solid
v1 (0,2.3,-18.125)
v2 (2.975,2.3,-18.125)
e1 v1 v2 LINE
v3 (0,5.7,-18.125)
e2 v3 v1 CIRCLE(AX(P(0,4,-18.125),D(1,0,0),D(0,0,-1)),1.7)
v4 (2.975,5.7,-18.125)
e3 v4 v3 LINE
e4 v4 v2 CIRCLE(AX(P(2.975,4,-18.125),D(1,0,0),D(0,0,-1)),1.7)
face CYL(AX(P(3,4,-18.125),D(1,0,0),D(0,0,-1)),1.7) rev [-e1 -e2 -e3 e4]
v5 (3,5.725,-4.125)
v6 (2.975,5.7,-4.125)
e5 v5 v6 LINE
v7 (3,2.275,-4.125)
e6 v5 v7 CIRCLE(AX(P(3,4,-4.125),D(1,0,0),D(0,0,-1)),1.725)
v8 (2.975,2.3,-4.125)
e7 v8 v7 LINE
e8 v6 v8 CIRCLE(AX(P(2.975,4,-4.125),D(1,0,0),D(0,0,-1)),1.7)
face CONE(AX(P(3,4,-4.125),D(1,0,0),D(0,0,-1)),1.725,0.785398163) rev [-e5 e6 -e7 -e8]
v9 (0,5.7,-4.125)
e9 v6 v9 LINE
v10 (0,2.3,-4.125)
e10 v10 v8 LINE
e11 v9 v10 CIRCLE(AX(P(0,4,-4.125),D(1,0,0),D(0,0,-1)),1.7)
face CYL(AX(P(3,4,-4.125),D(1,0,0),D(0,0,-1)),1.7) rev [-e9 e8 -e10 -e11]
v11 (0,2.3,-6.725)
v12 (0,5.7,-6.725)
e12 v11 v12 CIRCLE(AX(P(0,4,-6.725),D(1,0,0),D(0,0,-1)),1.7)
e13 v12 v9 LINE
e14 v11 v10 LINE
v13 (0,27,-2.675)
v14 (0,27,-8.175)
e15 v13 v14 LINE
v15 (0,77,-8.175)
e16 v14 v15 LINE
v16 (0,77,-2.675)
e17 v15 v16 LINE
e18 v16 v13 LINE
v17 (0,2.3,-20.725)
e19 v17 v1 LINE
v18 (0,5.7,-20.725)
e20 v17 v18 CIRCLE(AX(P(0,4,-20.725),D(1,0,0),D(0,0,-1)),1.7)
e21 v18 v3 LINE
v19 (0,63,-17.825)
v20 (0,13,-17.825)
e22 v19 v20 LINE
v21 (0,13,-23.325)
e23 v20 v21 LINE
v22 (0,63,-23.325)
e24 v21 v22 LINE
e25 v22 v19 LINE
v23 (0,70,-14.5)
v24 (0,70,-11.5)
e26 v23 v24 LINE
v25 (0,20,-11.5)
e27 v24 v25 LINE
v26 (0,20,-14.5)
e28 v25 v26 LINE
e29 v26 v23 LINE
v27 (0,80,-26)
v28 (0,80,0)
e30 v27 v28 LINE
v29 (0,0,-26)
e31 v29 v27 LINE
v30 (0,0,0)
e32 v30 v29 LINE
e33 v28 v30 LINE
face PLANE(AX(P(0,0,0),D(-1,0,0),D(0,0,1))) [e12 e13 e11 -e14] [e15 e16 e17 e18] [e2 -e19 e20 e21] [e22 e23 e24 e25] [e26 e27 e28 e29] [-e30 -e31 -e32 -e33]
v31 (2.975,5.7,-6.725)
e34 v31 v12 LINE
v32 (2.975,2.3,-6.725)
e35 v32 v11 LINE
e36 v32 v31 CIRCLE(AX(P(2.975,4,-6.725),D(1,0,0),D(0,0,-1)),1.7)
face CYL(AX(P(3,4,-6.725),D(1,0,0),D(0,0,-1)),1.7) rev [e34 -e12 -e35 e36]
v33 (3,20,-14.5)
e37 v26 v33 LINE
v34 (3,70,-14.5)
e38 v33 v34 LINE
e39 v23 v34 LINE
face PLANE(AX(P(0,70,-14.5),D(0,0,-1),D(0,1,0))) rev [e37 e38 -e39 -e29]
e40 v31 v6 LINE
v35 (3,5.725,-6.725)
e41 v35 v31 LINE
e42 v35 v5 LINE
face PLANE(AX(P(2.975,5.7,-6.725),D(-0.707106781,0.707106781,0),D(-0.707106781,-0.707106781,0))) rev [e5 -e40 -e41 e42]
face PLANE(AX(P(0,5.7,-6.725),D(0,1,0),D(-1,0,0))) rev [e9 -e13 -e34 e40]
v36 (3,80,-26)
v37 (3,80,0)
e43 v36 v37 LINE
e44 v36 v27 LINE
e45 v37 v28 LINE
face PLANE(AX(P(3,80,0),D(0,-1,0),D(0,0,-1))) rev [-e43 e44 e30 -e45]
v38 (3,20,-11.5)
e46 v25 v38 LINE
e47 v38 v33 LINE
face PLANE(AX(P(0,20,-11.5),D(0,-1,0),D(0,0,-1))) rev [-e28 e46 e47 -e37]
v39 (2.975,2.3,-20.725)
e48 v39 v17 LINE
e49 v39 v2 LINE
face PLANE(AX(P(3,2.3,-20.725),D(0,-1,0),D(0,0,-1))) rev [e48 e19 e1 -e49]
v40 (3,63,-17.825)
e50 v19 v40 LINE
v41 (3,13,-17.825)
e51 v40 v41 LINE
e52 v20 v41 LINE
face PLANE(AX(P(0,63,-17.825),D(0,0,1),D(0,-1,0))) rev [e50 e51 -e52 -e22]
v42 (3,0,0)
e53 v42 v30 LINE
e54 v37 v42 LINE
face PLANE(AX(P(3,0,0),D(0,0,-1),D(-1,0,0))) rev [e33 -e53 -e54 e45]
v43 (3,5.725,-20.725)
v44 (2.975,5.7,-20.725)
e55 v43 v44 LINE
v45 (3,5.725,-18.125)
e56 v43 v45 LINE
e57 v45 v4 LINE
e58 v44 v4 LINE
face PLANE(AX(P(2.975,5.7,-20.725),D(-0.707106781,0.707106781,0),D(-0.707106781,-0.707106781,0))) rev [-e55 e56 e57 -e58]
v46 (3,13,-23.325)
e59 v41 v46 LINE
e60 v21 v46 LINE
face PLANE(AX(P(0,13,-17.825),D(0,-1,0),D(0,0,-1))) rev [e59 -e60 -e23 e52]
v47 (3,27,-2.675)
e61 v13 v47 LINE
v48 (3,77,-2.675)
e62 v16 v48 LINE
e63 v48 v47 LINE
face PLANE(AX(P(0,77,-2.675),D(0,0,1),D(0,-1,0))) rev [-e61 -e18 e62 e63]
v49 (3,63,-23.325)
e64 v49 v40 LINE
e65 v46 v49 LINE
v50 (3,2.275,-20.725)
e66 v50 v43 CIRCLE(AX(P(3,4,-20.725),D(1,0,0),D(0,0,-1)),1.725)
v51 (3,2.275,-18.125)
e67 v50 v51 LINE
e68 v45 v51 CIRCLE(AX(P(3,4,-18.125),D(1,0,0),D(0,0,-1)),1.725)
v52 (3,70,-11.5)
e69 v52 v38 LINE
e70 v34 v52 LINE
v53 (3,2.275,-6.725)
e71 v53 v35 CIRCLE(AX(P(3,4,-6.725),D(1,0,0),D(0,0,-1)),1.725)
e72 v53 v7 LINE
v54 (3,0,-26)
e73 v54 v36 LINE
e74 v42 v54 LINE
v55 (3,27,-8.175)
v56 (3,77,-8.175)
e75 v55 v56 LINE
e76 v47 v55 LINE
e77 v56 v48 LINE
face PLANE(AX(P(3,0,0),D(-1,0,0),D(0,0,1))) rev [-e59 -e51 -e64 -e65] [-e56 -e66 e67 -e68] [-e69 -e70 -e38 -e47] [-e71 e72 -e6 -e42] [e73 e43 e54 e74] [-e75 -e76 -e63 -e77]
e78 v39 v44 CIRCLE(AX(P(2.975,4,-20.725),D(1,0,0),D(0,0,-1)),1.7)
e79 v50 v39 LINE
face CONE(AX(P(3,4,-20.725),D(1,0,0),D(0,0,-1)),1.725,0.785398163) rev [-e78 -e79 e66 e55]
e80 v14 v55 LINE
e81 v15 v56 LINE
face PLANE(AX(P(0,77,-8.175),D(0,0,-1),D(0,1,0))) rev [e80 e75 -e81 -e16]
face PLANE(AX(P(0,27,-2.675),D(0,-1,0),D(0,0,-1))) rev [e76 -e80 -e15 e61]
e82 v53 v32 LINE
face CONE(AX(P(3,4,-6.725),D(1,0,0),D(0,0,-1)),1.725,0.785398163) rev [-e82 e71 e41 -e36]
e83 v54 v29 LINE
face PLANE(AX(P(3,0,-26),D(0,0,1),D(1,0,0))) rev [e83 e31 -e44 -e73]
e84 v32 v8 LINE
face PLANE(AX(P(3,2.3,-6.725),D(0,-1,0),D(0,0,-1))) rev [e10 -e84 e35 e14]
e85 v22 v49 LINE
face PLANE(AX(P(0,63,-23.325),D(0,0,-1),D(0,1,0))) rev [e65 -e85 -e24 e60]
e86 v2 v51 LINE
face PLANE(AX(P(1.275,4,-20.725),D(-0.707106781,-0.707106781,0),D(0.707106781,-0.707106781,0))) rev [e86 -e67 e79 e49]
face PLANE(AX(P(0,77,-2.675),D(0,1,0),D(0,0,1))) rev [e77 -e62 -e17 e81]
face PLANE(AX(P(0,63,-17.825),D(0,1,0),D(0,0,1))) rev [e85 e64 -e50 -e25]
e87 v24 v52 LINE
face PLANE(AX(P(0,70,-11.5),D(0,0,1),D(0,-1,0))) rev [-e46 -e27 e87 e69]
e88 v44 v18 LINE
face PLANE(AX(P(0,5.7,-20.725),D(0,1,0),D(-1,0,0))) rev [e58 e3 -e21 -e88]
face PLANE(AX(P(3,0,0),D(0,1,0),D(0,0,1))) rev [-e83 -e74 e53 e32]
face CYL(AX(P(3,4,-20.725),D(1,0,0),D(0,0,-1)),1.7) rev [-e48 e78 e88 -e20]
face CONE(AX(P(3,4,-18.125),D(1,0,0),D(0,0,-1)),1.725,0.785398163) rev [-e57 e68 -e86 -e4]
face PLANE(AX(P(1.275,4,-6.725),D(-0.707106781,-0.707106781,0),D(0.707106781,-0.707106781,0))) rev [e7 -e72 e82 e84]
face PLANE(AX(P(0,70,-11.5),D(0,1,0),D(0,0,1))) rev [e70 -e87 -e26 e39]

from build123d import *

# Parameters (mm, degrees)
SKETCH1_W                = 26
SKETCH1_H                = 80
BOSS_EXTRUDE1_DEPTH      = 3
SKETCH2_W                = 5.5
SKETCH2_H                = 50
SKETCH2_W_2              = 3
CUT_EXTRUDE1_DEPTH       = 3
M3_START                 = -1
M3_CLEARANCE_SLOT1_DEPTH = 5


with BuildPart() as part:
    # Sketch1 → Boss-Extrude1 (new body)
    with BuildSketch(Plane(origin=(0, 0, 0), x_dir=(0, 0, -1), z_dir=(1, 0, 0))):
        with Locations((13, 40)):
            Rectangle(SKETCH1_W, SKETCH1_H)
    extrude(amount=BOSS_EXTRUDE1_DEPTH)

    # Sketch2 → Cut-Extrude1 (cut)
    with BuildSketch(Plane(origin=(3, 0, 0), x_dir=(0, 0, -1), z_dir=(1, 0, 0))):
        with Locations((5.425, 52)):
            Rectangle(SKETCH2_W, SKETCH2_H)
        with Locations((13, 45)):
            Rectangle(SKETCH2_W_2, SKETCH2_H)
        with Locations((20.575, 38)):
            Rectangle(SKETCH2_W, SKETCH2_H)
    extrude(amount=-CUT_EXTRUDE1_DEPTH, mode=Mode.SUBTRACT)

    # M3 Clearance Slot1: read off the stored shape, not the designer's step
    # M3 Clearance Slot1 outline → M3 Clearance Slot1 (cut)
    with BuildSketch(Plane.YZ.offset(M3_START)):
        with BuildLine():
            Line((5.7, -20.725), (5.7, -18.125))
            ThreePointArc((5.7, -18.125), (4, -16.425), (2.3, -18.125))
            Line((2.3, -18.125), (2.3, -20.725))
            ThreePointArc((2.3, -20.725), (4, -22.425), (5.7, -20.725))
        make_face()
        with BuildLine():
            ThreePointArc((5.7, -4.125), (4, -2.425), (2.3, -4.125))
            Line((2.3, -4.125), (2.3, -6.725))
            ThreePointArc((2.3, -6.725), (4, -8.425), (5.7, -6.725))
            Line((5.7, -6.725), (5.7, -4.125))
        make_face()
    extrude(amount=M3_CLEARANCE_SLOT1_DEPTH, mode=Mode.SUBTRACT)

    # M3 Clearance Slot1 2: loft between two sections, ruled curve by curve
    m3_clearance_slot1_2_from = [
        Edge.make_three_point_arc((2.975, 5.7, -18.125), (2.975, 5.202081528, -16.922918472), (2.975, 4, -16.425)),
        Edge.make_three_point_arc((2.975, 4, -16.425), (2.975, 2.797918472, -16.922918472), (2.975, 2.3, -18.125)),
        Edge.make_three_point_arc((2.975, 2.3, -20.725), (2.975, 2.797918472, -21.927081528), (2.975, 4, -22.425)),
        Edge.make_three_point_arc((2.975, 4, -22.425), (2.975, 5.202081528, -21.927081528), (2.975, 5.7, -20.725)),
        Edge.make_line((2.975, 2.3, -18.125), (2.975, 2.3, -20.725)),
        Edge.make_line((2.975, 5.7, -18.125), (2.975, 5.7, -20.725)),
    ]
    m3_clearance_slot1_2_to = [
        Edge.make_three_point_arc((3, 5.725, -18.125), (3, 5.219759198, -16.905240802), (3, 4, -16.4)),
        Edge.make_three_point_arc((3, 4, -16.4), (3, 2.780240802, -16.905240802), (3, 2.275, -18.125)),
        Edge.make_three_point_arc((3, 2.275, -20.725), (3, 2.780240802, -21.944759198), (3, 4, -22.45)),
        Edge.make_three_point_arc((3, 4, -22.45), (3, 5.219759198, -21.944759198), (3, 5.725, -20.725)),
        Edge.make_line((3, 2.275, -18.125), (3, 2.275, -20.725)),
        Edge.make_line((3, 5.725, -18.125), (3, 5.725, -20.725)),
    ]
    m3_clearance_slot1_2 = Solid(Shell([*[Face.make_surface_from_curves(m3_clearance_slot1_2_from[k], m3_clearance_slot1_2_to[k]) for k in range(6)], Face(Wire(m3_clearance_slot1_2_from)), Face(Wire(m3_clearance_slot1_2_to))]))
    add(m3_clearance_slot1_2, mode=Mode.SUBTRACT)

    # M3 Clearance Slot1 3: loft between two sections, ruled curve by curve
    m3_clearance_slot1_3_from = [
        Edge.make_three_point_arc((2.975, 5.7, -4.125), (2.975, 5.202081528, -2.922918472), (2.975, 4, -2.425)),
        Edge.make_three_point_arc((2.975, 4, -2.425), (2.975, 2.797918472, -2.922918472), (2.975, 2.3, -4.125)),
        Edge.make_three_point_arc((2.975, 2.3, -6.725), (2.975, 2.797918472, -7.927081528), (2.975, 4, -8.425)),
        Edge.make_three_point_arc((2.975, 4, -8.425), (2.975, 5.202081528, -7.927081528), (2.975, 5.7, -6.725)),
        Edge.make_line((2.975, 2.3, -4.125), (2.975, 2.3, -6.725)),
        Edge.make_line((2.975, 5.7, -4.125), (2.975, 5.7, -6.725)),
    ]
    m3_clearance_slot1_3_to = [
        Edge.make_three_point_arc((3, 5.725, -4.125), (3, 5.219759198, -2.905240802), (3, 4, -2.4)),
        Edge.make_three_point_arc((3, 4, -2.4), (3, 2.780240802, -2.905240802), (3, 2.275, -4.125)),
        Edge.make_three_point_arc((3, 2.275, -6.725), (3, 2.780240802, -7.944759198), (3, 4, -8.45)),
        Edge.make_three_point_arc((3, 4, -8.45), (3, 5.219759198, -7.944759198), (3, 5.725, -6.725)),
        Edge.make_line((3, 2.275, -4.125), (3, 2.275, -6.725)),
        Edge.make_line((3, 5.725, -4.125), (3, 5.725, -6.725)),
    ]
    m3_clearance_slot1_3 = Solid(Shell([*[Face.make_surface_from_curves(m3_clearance_slot1_3_from[k], m3_clearance_slot1_3_to[k]) for k in range(6)], Face(Wire(m3_clearance_slot1_3_from)), Face(Wire(m3_clearance_slot1_3_to))]))
    add(m3_clearance_slot1_3, mode=Mode.SUBTRACT)


solid = part.part
